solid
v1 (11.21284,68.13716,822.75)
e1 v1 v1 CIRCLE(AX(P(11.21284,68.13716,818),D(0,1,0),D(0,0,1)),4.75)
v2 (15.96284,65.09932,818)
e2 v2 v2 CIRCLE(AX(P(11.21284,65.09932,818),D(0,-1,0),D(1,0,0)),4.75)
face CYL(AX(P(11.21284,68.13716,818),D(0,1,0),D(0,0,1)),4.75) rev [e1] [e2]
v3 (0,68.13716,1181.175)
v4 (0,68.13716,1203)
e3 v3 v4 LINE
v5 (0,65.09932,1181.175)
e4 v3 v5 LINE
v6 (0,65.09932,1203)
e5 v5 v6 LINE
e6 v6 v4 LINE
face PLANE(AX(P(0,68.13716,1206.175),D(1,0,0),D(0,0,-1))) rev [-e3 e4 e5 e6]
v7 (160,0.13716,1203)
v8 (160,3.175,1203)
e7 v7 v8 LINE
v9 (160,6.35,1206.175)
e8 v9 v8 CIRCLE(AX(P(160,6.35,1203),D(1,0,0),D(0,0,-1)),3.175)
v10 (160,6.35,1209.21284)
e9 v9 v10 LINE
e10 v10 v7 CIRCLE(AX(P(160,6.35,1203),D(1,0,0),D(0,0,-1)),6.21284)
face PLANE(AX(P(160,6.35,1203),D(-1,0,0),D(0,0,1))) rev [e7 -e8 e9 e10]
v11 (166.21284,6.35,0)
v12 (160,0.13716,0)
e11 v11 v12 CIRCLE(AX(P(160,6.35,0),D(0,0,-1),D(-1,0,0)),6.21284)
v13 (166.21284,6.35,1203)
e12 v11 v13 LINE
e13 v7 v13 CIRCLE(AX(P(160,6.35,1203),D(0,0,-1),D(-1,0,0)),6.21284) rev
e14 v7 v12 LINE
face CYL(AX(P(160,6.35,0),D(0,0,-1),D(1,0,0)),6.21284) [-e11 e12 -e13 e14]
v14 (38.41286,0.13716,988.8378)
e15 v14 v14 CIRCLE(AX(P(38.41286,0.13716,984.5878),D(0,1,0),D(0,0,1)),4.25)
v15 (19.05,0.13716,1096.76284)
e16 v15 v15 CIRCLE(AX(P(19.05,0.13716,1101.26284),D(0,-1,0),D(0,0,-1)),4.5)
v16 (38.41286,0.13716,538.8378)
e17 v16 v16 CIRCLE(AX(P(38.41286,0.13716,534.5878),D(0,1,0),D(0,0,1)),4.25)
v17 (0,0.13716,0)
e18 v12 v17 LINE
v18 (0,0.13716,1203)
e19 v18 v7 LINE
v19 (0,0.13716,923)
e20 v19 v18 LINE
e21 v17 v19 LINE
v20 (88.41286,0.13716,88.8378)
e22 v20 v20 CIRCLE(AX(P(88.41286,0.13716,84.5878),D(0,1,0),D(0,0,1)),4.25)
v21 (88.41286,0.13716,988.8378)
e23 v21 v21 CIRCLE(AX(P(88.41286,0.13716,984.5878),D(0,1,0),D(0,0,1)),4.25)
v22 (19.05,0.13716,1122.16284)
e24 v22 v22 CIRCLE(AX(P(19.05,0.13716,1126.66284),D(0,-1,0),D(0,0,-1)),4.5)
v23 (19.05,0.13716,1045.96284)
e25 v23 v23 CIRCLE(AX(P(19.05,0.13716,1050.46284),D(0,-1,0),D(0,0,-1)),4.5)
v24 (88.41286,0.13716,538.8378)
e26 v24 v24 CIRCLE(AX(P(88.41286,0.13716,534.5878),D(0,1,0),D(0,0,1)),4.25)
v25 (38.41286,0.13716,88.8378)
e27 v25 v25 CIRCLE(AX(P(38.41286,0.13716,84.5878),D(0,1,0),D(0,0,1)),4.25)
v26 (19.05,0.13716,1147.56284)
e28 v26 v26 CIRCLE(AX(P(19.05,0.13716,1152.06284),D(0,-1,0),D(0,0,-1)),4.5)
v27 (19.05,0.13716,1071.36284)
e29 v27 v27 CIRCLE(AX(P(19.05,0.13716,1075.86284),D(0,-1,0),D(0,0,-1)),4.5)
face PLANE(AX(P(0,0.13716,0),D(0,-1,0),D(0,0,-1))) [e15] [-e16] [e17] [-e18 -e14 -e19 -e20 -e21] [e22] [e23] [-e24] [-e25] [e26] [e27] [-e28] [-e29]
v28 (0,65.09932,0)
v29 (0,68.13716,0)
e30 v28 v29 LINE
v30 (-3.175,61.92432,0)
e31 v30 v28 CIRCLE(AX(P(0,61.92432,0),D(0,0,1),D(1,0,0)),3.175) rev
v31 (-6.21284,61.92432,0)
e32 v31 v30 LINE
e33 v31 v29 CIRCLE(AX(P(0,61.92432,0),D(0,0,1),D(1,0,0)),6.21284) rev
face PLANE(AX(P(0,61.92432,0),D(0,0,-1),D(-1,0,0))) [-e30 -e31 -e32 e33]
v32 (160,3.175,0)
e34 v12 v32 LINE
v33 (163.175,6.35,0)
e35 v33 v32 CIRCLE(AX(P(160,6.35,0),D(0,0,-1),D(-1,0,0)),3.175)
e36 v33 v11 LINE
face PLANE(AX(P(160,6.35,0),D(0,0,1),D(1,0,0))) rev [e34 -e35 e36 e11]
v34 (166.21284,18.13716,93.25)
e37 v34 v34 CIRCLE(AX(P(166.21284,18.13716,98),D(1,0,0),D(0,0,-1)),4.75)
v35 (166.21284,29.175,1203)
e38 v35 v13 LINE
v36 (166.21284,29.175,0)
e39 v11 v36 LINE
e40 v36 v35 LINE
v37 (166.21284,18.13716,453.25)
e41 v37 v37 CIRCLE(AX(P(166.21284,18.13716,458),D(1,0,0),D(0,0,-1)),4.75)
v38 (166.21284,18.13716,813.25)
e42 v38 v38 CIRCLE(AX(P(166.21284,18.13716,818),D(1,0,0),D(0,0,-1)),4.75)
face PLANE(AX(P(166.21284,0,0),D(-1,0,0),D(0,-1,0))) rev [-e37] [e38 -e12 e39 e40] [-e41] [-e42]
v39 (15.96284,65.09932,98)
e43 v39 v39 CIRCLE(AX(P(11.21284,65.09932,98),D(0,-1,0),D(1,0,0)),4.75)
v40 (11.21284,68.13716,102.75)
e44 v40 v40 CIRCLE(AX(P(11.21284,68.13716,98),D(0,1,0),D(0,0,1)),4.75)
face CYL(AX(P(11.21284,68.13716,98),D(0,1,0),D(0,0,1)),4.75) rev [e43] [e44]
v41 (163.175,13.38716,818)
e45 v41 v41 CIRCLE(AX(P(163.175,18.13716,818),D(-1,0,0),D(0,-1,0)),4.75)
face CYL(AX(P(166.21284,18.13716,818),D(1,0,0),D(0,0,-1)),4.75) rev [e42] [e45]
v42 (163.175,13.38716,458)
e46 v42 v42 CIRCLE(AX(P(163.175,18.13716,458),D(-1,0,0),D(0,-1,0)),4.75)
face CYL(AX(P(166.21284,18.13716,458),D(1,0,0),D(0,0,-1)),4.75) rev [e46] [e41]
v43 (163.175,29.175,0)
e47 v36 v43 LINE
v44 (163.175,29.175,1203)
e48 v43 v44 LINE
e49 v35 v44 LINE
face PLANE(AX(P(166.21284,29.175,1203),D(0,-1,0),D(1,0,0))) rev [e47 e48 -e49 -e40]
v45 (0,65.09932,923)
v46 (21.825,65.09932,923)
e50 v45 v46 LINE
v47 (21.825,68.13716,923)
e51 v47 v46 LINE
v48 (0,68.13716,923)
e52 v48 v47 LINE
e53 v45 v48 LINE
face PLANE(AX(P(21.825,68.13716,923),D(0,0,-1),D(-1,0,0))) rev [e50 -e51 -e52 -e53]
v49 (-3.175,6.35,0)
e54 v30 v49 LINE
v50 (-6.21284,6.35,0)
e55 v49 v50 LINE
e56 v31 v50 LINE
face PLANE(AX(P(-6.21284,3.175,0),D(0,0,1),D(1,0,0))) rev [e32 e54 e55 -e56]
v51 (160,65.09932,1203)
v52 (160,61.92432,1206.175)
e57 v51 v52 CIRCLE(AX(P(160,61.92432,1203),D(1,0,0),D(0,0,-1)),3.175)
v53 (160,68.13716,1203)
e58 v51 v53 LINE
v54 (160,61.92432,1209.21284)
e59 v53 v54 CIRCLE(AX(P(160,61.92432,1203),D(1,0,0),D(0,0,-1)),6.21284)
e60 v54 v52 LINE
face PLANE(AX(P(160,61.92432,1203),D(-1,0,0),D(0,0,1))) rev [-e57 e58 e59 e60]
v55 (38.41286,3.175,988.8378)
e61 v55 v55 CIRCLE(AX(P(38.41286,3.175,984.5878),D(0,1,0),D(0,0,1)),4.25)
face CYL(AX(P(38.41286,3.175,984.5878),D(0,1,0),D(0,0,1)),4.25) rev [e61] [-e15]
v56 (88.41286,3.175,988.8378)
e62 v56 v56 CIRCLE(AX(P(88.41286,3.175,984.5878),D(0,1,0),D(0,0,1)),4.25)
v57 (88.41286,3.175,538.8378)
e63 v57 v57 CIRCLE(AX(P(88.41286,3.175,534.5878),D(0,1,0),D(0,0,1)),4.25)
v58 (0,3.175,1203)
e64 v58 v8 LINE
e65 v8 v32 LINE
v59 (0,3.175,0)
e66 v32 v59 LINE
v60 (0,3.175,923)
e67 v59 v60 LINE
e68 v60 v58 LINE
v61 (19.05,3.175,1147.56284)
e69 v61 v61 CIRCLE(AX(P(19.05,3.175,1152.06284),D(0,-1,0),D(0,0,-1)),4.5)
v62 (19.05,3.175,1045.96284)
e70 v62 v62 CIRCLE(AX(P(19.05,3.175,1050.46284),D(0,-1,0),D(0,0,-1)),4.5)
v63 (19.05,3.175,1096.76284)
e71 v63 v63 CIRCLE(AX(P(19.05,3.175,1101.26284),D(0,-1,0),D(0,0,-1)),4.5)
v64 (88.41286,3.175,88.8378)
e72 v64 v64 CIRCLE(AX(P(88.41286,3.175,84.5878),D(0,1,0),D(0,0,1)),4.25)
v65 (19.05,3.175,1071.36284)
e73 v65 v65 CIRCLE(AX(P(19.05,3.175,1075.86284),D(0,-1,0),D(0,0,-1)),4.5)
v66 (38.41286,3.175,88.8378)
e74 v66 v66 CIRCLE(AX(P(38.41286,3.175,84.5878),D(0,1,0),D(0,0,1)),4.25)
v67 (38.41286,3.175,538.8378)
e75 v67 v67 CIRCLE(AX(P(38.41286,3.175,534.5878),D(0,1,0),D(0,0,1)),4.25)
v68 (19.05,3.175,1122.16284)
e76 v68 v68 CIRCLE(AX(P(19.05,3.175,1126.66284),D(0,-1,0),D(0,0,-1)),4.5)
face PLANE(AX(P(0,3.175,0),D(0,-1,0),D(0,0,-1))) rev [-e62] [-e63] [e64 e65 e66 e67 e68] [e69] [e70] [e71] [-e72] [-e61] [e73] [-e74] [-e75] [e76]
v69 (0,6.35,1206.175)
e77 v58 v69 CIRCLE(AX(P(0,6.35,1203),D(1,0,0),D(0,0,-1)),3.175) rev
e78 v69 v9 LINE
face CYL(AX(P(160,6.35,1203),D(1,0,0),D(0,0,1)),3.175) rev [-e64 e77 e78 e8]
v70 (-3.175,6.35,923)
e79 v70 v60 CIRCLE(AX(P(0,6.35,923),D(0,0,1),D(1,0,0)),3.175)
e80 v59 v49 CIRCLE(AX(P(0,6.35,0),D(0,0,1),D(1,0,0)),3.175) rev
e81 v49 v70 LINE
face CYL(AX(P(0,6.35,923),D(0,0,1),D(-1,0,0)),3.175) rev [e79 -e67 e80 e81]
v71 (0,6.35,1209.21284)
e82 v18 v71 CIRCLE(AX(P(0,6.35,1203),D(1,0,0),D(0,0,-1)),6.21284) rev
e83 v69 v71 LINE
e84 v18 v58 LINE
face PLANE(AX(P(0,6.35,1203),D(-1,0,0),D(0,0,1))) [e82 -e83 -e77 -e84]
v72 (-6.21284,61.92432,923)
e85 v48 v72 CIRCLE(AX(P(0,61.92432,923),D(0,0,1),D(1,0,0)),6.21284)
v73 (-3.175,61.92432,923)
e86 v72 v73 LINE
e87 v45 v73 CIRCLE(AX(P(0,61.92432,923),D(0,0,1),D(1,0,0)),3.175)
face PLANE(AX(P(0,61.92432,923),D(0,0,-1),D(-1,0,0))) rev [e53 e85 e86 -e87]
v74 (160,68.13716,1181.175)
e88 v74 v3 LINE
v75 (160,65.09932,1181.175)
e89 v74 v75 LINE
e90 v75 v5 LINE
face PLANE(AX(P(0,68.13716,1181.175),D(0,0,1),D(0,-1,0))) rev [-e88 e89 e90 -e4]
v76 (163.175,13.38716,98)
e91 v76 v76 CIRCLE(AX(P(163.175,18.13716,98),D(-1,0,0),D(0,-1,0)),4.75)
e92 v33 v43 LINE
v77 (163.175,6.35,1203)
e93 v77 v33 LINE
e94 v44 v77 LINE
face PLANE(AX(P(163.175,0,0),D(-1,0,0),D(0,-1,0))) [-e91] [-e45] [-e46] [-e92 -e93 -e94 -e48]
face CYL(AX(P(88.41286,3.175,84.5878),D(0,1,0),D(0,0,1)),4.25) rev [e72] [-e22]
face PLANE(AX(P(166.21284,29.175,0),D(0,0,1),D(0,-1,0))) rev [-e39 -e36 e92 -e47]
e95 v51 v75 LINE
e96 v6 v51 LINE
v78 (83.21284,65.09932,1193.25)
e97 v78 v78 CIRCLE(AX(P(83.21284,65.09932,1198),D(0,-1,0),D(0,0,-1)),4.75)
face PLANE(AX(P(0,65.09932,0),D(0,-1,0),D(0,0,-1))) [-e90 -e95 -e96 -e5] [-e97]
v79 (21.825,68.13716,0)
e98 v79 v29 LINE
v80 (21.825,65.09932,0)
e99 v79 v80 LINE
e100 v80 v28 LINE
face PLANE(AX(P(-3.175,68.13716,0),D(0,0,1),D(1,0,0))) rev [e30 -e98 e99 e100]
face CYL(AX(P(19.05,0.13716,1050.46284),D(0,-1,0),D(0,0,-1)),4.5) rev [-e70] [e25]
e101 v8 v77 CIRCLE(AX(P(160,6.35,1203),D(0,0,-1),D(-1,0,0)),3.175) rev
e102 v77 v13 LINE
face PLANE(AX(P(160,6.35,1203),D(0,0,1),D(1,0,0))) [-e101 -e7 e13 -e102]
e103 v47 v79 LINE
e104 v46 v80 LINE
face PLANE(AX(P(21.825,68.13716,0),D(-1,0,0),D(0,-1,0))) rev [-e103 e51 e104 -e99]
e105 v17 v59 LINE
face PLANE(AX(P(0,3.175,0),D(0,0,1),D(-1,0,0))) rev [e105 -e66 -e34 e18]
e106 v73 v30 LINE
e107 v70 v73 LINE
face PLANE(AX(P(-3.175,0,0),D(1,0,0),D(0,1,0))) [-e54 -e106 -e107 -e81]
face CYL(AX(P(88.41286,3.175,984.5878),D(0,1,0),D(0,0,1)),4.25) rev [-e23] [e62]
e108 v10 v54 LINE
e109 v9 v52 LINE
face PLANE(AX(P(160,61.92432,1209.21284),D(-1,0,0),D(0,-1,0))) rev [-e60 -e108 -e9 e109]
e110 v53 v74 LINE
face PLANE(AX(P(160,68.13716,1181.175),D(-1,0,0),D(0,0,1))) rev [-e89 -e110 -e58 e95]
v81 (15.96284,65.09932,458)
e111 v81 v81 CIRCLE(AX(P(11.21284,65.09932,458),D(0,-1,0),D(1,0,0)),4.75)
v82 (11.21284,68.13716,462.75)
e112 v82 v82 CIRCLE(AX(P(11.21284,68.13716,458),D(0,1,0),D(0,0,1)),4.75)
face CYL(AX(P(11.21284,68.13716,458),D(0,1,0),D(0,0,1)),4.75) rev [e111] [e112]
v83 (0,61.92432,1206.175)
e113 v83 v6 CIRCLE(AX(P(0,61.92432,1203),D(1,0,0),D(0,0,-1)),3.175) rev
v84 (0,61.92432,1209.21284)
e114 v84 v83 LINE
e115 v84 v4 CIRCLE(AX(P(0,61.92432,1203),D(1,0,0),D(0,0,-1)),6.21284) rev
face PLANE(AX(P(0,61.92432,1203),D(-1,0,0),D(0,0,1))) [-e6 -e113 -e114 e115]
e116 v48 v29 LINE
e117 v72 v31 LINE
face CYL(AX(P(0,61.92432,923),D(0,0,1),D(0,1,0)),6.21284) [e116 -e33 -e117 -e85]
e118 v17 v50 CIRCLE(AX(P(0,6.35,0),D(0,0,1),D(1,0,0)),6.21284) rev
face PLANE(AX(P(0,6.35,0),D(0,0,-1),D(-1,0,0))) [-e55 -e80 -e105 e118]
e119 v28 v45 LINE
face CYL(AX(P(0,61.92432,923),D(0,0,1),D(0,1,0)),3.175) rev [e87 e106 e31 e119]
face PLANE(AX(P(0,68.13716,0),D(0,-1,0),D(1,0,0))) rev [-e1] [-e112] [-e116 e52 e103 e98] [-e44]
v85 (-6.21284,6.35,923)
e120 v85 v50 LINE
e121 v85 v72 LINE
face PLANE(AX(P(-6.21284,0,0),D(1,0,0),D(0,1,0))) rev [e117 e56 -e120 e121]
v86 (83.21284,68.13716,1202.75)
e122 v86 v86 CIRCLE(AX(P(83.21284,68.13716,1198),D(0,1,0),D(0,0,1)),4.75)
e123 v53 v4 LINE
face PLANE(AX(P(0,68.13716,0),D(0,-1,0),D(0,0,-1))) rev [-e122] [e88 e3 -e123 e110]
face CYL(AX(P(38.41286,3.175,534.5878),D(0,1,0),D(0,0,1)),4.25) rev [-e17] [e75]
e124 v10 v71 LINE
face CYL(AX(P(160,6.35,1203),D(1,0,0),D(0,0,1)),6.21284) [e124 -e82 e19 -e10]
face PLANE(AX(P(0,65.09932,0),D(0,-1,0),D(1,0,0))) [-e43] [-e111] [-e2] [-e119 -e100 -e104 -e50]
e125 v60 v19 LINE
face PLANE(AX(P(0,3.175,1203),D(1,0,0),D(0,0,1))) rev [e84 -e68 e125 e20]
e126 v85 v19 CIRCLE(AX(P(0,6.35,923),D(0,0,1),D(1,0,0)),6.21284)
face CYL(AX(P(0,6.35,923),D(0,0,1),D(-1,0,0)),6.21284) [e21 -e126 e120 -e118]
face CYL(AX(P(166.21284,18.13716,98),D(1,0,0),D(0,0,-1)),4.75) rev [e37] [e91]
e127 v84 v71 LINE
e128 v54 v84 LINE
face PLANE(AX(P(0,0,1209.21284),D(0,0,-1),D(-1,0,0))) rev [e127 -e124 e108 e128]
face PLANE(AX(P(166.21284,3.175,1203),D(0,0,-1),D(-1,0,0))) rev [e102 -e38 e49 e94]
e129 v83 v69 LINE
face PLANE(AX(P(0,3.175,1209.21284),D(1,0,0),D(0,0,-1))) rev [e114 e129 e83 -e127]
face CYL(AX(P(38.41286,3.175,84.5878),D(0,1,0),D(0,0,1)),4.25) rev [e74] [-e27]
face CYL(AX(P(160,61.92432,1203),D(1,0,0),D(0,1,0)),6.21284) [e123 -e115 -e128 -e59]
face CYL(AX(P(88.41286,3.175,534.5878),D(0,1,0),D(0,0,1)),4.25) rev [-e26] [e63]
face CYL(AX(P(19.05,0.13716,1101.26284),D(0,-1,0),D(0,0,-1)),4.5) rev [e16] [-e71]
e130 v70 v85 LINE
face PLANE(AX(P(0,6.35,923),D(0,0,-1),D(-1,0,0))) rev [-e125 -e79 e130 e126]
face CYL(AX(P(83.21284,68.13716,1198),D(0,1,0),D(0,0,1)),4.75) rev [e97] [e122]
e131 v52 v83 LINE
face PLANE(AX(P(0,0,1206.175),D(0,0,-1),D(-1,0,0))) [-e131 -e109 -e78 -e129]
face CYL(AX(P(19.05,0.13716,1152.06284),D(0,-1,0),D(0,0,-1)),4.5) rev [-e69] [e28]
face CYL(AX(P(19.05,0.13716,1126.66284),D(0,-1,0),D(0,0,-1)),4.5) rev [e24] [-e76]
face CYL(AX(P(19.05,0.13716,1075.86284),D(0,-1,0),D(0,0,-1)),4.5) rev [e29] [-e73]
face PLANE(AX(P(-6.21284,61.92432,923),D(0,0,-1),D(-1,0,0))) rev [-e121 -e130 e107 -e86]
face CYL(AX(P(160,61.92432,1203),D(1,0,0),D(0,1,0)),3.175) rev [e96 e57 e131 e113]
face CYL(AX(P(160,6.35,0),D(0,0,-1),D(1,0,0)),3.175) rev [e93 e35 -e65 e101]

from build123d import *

# Parameters (mm, degrees)
SKETCH1_W                      = 160
SKETCH1_H                      = 1203
BOSS_EXTRUDE1_DEPTH            = 3.175
CONVERT_SOLID1_OUTLINE_W       = 160
CONVERT_SOLID1_OUTLINE_H       = 1203
CONVERT_SOLID1_DEPTH           = 0.13716
EDGE_FLANGE1_DEPTH             = 1203
EDGE_FLANGE2_START             = -160
EDGE_FLANGE2_DEPTH             = 160
EDGE_FLANGE2_2_DEPTH           = 923
EDGE_FLANGE3_DEPTH             = 923
EDGE_FLANGE3_BEND_DEPTH        = 160
F_9_5_9_5_DIAMETER_HOLE9_D     = 9.5
F_9_5_9_5_DIAMETER_HOLE9_DEPTH = 3.03784
F_9_5_9_5_DIAMETER_HOLE8_D     = 9.5
F_9_5_9_5_DIAMETER_HOLE8_DEPTH = 3.03784
M6_CLEARANCE_HOLE1_D           = 8.5
M8_CLEARANCE_HOLE1_D           = 9


# Read off the part's stored shape, not the designer's step: Convert-Solid1, Edge-Flange2
# Sheet-metal steps are written as plain solids
with BuildPart() as part:
    # Sketch1 → Boss-Extrude1 (new body)
    with BuildSketch(Plane(origin=(0, 0, 0), x_dir=(1, 0, 0), z_dir=(0, 1, 0))):
        with Locations((80, -601.5)):
            Rectangle(SKETCH1_W, SKETCH1_H)
    extrude(amount=BOSS_EXTRUDE1_DEPTH)

    # Convert-Solid1 outline → Convert-Solid1 (cut)
    with BuildSketch(Plane(origin=(0, 0, 0), x_dir=(1, 0, 0), z_dir=(0, 1, 0))):
        with Locations((80, -601.5)):
            Rectangle(CONVERT_SOLID1_OUTLINE_W, CONVERT_SOLID1_OUTLINE_H)
    extrude(amount=CONVERT_SOLID1_DEPTH, mode=Mode.SUBTRACT)

    # Edge-Flange1 section (across the edge) → Edge-Flange1 (add)
    with BuildSketch(Plane(origin=(163.175, 3.175, 1203), x_dir=(-1, 0, 0), z_dir=(0, 0, -1))):
        with BuildLine():
            Line((-3.03784, 3.175), (-3.03784, 26))
            Line((-3.03784, 26), (0, 26))
            Line((0, 26), (0, 3.175))
            ThreePointArc((0, 3.175), (0.92993597, 0.92993597), (3.175, 0))
            Line((3.175, 0), (3.175, -3.03784))
            ThreePointArc((3.175, -3.03784), (-1.218141294, -1.218141294), (-3.03784, 3.175))
        make_face()
    extrude(amount=EDGE_FLANGE1_DEPTH)

    # Edge-Flange2 outline → Edge-Flange2 (add)
    with BuildSketch(Plane(origin=(0, 3.175, 0), x_dir=(0, 0, 1), z_dir=(-1, 0, 0)).offset(EDGE_FLANGE2_START)):
        with BuildLine():
            Line((1209.21284, 58.74932), (1206.175, 58.74932))
            Line((1206.175, 58.74932), (1206.175, 3.175))
            ThreePointArc((1206.175, 3.175), (1205.24506403, 0.92993597), (1203, 0))
            Line((1203, 0), (1203, -3.03784))
            ThreePointArc((1203, -3.03784), (1207.393141294, -1.218141294), (1209.21284, 3.175))
            Line((1209.21284, 3.175), (1209.21284, 58.74932))
        make_face()
    extrude(amount=EDGE_FLANGE2_DEPTH)

    # Edge-Flange2 2 outline → Edge-Flange2 2 (add)
    with BuildSketch(Plane.XY):
        with BuildLine():
            Line((-6.21284, 61.92432), (-6.21284, 6.35))
            ThreePointArc((-6.21284, 6.35), (-4.393141294, 1.956858706), (0, 0.13716))
            Line((0, 0.13716), (0, 3.175))
            ThreePointArc((0, 3.175), (-2.24506403, 4.10493597), (-3.175, 6.35))
            Line((-3.175, 6.35), (-3.175, 61.92432))
            Line((-3.175, 61.92432), (-6.21284, 61.92432))
        make_face()
    extrude(amount=EDGE_FLANGE2_2_DEPTH)

    # Edge-Flange3 section (across the edge) → Edge-Flange3 (add)
    with BuildSketch(Plane(origin=(-3.175, 65.09932, 0), x_dir=(0, -1, 0), z_dir=(0, 0, 1))):
        with BuildLine():
            Line((-3.03784, 3.175), (-3.03784, 25))
            Line((-3.03784, 25), (0, 25))
            Line((0, 25), (0, 3.175))
            ThreePointArc((0, 3.175), (0.92993597, 0.92993597), (3.175, 0))
            Line((3.175, 0), (3.175, -3.03784))
            ThreePointArc((3.175, -3.03784), (-1.218141294, -1.218141294), (-3.03784, 3.175))
        make_face()
    extrude(amount=EDGE_FLANGE3_DEPTH)

    # Edge-Flange3 section 2 (across the edge) → Edge-Flange3 bend (add)
    with BuildSketch(Plane(origin=(0, 65.09932, 1206.175), x_dir=(0, -1, 0), z_dir=(1, 0, 0))):
        with BuildLine():
            Line((-3.03784, 3.175), (-3.03784, 25))
            Line((-3.03784, 25), (0, 25))
            Line((0, 25), (0, 3.175))
            ThreePointArc((0, 3.175), (0.92993597, 0.92993597), (3.175, 0))
            Line((3.175, 0), (3.175, -3.03784))
            ThreePointArc((3.175, -3.03784), (-1.218141294, -1.218141294), (-3.03784, 3.175))
        make_face()
    extrude(amount=EDGE_FLANGE3_BEND_DEPTH)

    # Ø9.5 (9.5) Diameter Hole9
    with Locations(Plane(origin=(166.21284, 0, 0), x_dir=(0, 0, -1), z_dir=(1, 0, 0))):
        with Locations((-98, 18.13716), (-458, 18.13716), (-818, 18.13716)):
            Hole(F_9_5_9_5_DIAMETER_HOLE9_D / 2, depth=F_9_5_9_5_DIAMETER_HOLE9_DEPTH)

    # Ø9.5 (9.5) Diameter Hole8
    with Locations(Plane(origin=(0, 68.13716, 0), x_dir=(1, 0, 0), z_dir=(0, 1, 0))):
        with Locations((11.21284, -98), (11.21284, -458), (11.21284, -818), (83.21284, -1198)):
            Hole(F_9_5_9_5_DIAMETER_HOLE8_D / 2, depth=F_9_5_9_5_DIAMETER_HOLE8_DEPTH)

    # M6 Clearance Hole1 (through all)
    with Locations(Plane(origin=(0, 3.175, 0), x_dir=(1, 0, 0), z_dir=(0, 1, 0))):
        with Locations((38.41286, -84.5878), (88.41286, -84.5878), (88.41286, -534.5878), (38.41286, -534.5878), (38.41286, -984.5878), (88.41286, -984.5878)):
            Hole(M6_CLEARANCE_HOLE1_D / 2)

    # M8 Clearance Hole1 (through all)
    with Locations(Plane(origin=(0, 0.13716, 0), x_dir=(-1, 0, 0), z_dir=(0, -1, 0))):
        with Locations((-19.05, -1152.06284), (-19.05, -1126.66284), (-19.05, -1101.26284), (-19.05, -1075.86284), (-19.05, -1050.46284)):
            Hole(M8_CLEARANCE_HOLE1_D / 2)


solid = part.part
